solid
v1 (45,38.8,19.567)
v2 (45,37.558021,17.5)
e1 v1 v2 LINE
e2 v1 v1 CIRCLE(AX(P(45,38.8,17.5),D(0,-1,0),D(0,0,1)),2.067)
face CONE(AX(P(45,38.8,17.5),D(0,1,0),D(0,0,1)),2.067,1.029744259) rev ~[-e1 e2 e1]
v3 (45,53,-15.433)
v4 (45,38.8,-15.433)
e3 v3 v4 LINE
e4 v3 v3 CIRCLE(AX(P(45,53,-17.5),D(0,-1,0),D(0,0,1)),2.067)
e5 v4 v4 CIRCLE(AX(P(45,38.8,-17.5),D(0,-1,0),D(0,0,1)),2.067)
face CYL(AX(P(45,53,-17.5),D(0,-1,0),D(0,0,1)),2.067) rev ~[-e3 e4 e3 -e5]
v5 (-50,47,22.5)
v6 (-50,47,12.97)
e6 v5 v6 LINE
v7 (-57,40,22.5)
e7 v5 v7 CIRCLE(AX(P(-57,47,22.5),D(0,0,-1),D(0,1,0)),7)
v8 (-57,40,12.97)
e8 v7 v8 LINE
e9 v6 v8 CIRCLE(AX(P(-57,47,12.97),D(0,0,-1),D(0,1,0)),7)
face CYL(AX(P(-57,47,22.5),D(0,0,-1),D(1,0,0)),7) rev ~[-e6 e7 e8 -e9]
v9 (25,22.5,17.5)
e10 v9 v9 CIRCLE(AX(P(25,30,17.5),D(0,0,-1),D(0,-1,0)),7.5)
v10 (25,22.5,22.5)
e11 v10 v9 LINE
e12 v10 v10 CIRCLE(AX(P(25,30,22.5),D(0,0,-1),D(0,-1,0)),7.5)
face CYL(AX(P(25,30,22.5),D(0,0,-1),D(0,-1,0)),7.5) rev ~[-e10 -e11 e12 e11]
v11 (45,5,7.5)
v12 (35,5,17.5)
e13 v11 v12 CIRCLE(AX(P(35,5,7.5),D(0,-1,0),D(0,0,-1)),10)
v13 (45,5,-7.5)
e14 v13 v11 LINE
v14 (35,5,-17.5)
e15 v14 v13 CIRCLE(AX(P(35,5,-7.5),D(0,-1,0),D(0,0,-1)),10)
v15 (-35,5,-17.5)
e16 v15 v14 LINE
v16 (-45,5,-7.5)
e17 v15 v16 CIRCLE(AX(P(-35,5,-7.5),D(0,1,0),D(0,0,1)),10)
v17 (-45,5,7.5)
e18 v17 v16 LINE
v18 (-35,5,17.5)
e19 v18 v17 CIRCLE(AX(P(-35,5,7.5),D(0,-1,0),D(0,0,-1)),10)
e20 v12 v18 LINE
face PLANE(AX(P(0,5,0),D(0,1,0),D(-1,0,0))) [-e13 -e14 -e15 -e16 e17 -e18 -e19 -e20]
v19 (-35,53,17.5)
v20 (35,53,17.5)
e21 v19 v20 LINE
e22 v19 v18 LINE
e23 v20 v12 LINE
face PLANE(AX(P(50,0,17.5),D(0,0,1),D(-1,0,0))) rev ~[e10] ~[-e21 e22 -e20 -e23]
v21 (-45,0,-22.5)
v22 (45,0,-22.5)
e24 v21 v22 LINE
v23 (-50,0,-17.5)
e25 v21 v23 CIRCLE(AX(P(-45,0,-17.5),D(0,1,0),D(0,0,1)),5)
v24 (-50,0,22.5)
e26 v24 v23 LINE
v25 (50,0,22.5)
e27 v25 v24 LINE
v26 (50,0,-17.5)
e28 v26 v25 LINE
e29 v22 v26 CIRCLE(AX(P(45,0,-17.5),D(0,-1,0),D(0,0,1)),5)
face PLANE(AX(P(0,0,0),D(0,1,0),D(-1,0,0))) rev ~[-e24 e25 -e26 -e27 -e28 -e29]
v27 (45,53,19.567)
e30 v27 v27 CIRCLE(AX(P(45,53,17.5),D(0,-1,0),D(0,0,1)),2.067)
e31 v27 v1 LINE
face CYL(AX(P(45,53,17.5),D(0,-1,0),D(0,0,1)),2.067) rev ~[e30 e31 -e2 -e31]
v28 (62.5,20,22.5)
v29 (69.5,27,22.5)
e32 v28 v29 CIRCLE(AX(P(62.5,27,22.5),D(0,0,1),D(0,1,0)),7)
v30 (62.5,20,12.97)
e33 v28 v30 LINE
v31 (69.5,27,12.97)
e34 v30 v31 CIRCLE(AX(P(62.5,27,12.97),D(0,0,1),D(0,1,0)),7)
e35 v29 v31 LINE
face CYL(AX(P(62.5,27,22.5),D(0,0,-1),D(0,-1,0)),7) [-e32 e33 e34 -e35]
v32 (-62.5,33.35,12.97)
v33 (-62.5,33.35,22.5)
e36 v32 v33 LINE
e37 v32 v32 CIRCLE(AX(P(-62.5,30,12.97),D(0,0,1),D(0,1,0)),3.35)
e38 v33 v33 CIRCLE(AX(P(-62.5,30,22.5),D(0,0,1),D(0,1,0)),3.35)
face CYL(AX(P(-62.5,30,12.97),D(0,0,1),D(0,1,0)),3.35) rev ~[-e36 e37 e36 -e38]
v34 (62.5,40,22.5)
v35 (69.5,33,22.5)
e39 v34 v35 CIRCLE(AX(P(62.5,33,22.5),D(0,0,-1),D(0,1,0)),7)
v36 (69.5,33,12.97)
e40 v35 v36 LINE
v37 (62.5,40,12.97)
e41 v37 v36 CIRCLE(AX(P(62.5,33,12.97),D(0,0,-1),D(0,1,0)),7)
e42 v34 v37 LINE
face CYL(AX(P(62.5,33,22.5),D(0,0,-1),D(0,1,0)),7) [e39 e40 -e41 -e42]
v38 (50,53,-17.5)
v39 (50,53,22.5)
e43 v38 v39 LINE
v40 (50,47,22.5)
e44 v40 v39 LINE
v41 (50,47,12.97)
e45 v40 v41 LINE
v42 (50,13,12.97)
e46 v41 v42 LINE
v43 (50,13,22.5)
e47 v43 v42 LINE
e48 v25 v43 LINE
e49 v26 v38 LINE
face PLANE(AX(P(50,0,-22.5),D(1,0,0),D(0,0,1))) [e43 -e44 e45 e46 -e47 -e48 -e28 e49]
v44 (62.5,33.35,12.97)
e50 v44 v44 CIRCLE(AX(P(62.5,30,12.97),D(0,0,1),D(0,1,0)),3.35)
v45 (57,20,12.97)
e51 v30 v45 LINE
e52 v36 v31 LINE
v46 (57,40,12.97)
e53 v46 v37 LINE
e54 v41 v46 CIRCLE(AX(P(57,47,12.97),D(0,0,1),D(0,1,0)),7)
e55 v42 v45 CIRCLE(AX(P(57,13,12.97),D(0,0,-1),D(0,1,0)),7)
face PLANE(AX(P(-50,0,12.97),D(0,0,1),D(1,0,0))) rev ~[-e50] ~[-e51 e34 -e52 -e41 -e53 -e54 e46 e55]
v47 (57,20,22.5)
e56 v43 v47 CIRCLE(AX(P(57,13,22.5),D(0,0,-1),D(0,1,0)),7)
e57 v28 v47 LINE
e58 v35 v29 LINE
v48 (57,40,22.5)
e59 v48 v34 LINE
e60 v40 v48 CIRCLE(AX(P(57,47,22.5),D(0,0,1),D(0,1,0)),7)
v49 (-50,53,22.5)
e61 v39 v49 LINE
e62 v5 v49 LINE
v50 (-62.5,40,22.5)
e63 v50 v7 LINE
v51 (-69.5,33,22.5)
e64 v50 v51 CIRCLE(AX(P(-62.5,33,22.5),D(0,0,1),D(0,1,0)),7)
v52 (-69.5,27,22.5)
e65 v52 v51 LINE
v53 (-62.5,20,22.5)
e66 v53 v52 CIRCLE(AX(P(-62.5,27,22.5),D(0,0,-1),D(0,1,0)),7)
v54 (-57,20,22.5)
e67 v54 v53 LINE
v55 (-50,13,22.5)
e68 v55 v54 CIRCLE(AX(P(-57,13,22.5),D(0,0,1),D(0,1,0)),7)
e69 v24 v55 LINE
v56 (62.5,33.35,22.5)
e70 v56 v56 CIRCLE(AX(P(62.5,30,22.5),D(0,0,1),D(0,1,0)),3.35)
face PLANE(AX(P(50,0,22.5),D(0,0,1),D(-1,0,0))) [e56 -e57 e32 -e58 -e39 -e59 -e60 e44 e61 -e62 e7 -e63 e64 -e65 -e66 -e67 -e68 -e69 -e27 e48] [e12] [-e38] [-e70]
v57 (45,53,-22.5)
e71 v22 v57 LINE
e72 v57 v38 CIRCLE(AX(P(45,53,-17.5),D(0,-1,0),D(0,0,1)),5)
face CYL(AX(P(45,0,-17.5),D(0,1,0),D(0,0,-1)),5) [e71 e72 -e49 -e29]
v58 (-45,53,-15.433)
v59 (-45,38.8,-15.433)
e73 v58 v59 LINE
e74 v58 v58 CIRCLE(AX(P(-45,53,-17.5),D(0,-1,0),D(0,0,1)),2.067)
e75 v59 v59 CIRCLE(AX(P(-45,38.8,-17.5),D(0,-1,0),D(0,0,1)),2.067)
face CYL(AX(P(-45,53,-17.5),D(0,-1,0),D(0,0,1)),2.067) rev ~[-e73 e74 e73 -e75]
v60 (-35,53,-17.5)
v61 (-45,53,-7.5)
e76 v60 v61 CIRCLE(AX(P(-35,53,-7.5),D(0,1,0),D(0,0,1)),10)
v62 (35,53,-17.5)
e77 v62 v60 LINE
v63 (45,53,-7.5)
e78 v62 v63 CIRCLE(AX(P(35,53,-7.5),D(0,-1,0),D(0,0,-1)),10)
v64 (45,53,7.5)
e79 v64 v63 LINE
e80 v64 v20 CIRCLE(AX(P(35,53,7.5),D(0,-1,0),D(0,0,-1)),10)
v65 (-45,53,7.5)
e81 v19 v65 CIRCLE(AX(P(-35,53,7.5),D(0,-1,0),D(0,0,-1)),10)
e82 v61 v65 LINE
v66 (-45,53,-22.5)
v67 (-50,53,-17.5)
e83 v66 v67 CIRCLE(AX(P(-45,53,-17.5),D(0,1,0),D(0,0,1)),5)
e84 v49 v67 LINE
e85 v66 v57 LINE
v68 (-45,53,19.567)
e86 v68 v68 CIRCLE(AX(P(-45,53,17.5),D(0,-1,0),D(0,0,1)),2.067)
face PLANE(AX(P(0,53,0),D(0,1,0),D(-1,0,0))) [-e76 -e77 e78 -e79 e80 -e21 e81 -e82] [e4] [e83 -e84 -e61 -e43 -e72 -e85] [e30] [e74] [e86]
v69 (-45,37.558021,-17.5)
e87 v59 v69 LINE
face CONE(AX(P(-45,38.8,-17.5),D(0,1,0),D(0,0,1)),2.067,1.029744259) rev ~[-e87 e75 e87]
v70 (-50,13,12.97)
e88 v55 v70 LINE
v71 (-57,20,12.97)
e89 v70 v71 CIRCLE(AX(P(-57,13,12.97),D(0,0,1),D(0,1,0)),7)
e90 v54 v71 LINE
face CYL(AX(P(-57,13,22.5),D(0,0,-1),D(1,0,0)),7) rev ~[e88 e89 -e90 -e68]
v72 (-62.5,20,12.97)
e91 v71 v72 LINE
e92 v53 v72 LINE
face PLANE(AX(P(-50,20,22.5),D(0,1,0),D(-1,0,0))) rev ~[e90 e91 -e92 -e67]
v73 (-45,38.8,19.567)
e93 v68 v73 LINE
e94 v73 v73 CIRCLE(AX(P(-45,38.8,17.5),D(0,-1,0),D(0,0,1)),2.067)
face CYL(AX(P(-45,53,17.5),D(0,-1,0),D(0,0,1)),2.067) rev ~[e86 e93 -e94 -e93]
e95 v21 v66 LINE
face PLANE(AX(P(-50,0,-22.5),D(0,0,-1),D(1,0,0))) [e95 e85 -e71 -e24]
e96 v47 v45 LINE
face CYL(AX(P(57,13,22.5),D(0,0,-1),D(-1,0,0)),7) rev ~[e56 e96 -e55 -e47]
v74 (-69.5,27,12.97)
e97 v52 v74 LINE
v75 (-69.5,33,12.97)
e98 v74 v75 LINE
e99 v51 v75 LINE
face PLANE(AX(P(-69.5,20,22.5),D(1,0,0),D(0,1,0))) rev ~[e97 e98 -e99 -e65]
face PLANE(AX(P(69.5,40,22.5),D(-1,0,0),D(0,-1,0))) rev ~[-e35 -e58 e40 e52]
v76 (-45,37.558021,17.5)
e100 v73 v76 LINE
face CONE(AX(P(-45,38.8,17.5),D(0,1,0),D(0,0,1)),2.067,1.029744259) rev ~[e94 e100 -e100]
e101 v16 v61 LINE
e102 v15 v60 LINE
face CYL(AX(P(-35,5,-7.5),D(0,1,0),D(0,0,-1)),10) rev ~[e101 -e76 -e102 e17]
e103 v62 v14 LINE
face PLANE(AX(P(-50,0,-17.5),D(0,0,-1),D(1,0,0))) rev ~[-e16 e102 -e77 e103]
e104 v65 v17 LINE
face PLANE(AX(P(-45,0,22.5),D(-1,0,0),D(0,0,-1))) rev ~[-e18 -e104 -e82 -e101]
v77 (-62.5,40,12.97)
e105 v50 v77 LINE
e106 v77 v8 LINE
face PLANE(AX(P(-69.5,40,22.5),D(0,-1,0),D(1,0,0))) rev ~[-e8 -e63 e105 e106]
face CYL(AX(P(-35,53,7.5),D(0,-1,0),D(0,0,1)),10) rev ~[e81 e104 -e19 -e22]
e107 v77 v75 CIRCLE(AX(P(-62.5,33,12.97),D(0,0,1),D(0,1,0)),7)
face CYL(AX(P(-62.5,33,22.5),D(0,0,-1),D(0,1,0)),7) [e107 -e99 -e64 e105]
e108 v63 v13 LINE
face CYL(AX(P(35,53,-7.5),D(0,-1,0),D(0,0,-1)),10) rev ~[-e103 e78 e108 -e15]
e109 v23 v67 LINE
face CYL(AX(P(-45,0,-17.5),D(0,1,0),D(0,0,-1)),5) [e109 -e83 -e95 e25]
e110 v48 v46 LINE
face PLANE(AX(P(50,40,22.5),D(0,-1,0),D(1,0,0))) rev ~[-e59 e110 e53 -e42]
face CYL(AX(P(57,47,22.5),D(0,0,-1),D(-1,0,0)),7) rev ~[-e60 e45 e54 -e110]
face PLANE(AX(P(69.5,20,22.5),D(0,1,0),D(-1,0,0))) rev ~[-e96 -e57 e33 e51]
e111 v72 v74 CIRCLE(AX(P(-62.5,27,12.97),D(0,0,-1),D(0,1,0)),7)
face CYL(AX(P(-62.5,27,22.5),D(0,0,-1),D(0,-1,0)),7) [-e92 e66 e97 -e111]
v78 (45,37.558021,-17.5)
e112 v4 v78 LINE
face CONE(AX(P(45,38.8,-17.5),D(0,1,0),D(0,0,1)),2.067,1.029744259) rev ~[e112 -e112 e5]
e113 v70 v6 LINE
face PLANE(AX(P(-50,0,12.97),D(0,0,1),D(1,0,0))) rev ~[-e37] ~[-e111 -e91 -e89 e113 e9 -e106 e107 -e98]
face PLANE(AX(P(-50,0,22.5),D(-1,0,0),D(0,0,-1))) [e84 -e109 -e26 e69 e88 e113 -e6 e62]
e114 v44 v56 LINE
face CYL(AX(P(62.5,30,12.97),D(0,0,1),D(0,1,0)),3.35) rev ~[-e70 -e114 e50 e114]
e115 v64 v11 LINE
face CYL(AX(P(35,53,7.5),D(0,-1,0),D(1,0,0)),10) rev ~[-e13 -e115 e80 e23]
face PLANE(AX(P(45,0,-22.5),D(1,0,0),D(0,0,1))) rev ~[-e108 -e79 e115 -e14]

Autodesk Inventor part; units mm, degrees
ref_plane "YZ Plane" through (0, 0, 0) normal (1, 0, 0) x (0, 1, 0)
ref_plane "XZ Plane" through (0, 0, 0) normal (0, 1, 0) x (-1, 0, 0)
ref_plane "XY Plane" through (0, 0, 0) normal (0, 0, 1) x (1, 0, 0)
sketch "Body Outline" plane through (0, 0, 0) normal (0, 1, 0) x (-1, 0, 0)
  line L0 (50, -22.5) -> (-50, -22.5)
  line L1 (-50, -22.5) -> (-50, 22.5)
  line L2 (-50, 22.5) -> (50, 22.5)
  line L3 (50, 22.5) -> (50, -22.5)
  point P0 (0, 0)
  dimension "d0" = 45
  dimension "d1" = 22.5
  dimension "d2" = 100
  dimension "d3" = 50
extrude "Body" add sketch "Body Outline" along normal blind 53
shell "Shell" thickness 5 removed faces 1 at (-16.6667, 53, 7.5)
fillet "Shell Fillet" radius 10 4 edges at (-45, 29, -17.5) (45, 29, -17.5) (45, 29, 17.5) (-45, 29, 17.5)
fillet "Shell Fillet" radius 5 2 edges at (-50, 26.5, -22.5) (50, 26.5, -22.5)
sketch "Lid Fastening Hole Pattern" plane through (0, 53, 0) normal (0, 1, 0) x (1, 0, 0)
  line L0 (45, 22.5) -> (-45, 22.5) projected
  line L1 (-50, 17.5) -> (-50, -22.5) projected
  point P0 (0, 0)
  point P1 (-45, 17.5)
  point P2 (45, 17.5)
  point P3 (-45, -17.5)
  point P4 (45, -17.5)
  dimension "d115" = 5
  dimension "d116" = 5
  dimension "d119" = 90
  dimension "d122" = 35
hole "Lid Fastening Holes" at (-45, 53, -17.5) at (45, 53, -17.5) at (-45, 53, 17.5) at (45, 53, 17.5) direction (0, -1, 0) diameter 4.134 depth 14.2 tip angle 118 thread size "M5x0.8" class "6H" standard "ISO Metric profile"
sketch "Cable Exit Hole Position" plane through (-50, 0, 22.5) normal (0, 0, 1) x (1, 0, 0)
  line L0 (100, 0) -> (0, 0) projected
  line L1 (100, 0) -> (100, 53) projected
  point P0 (50, 0)
  point P1 (75, 30)
  dimension "d167" = 30
  dimension "d168" = 25
hole "Cable Exit Hole" at (25, 30, 22.5) direction (0, 0, -1) diameter 15 depth 5
sketch "Flanges Outline" plane through (-50, 0, 22.5) normal (0, 0, 1) x (1, 0, 0)
  line L0 (-19.5, 40) -> (0, 40)
  line L1 (0, 40) -> (0, 20)
  line L2 (0, 20) -> (-19.5, 20)
  line L3 (-19.5, 20) -> (-19.5, 40)
  line L4 (100, 40) -> (119.5, 40)
  line L5 (119.5, 40) -> (119.5, 20)
  line L6 (119.5, 20) -> (100, 20)
  line L7 (100, 20) -> (100, 40)
  line L8 (0, 0) -> (0, 53) projected
  line L9 (100, 0) -> (100, 53) projected
  line L10 (100, 0) -> (0, 0) projected
  line L11 (0, 53) -> (100, 53) projected
  point P0 (50, 0)
  dimension "d176" = 0
  dimension "d177" = 0
  dimension "d178" = 19.5
  dimension "d179" = 19.5
  dimension "d180" = 20
  dimension "d181" = 20
  dimension "d182" = 13
  dimension "d183" = 13
extrude "Flanges" add sketch "Flanges Outline" against normal blind 9.53 contours L0 L1 L2 L3 | L4 L5 L6 L7
fillet "Flanges Fillet" radius 7 8 edges at (-50, 40, 17.735) (-69.5, 40, 17.735) (-69.5, 20, 17.735) (-50, 20, 17.735) (50, 40, 17.735) (69.5, 40, 17.735) (69.5, 20, 17.735) (50, 20, 17.735)
sketch "Box Fastening Hole Pattern" plane through (-50, 0, 12.97) normal (0, 0, -1) x (-1, 0, 0)
  line L0 (0, 0) -> (0, 53) projected
  line L1 (-5, 0) -> (-95, 0) projected
  point P0 (-50, 0)
  point P1 (12.5, 30)
  point P2 (-112.5, 30)
  dimension "d187" = 12.5
  dimension "d188" = 30
  dimension "d191" = 125
hole "Box Fastening Holes" at (-62.5, 30, 12.97) at (62.5, 30, 12.97) direction (0, 0, 1) diameter 6.7 end through all
equation "\"d1\" = 0.5 * d0"
equation "\"d3\" = 0.5 * d2"
equation "\"d116\" = d115"
equation "\"d179\" = d178"
equation "\"d181\" = d180"
properties part number "Connector Box" material "Aluminum 6061"
